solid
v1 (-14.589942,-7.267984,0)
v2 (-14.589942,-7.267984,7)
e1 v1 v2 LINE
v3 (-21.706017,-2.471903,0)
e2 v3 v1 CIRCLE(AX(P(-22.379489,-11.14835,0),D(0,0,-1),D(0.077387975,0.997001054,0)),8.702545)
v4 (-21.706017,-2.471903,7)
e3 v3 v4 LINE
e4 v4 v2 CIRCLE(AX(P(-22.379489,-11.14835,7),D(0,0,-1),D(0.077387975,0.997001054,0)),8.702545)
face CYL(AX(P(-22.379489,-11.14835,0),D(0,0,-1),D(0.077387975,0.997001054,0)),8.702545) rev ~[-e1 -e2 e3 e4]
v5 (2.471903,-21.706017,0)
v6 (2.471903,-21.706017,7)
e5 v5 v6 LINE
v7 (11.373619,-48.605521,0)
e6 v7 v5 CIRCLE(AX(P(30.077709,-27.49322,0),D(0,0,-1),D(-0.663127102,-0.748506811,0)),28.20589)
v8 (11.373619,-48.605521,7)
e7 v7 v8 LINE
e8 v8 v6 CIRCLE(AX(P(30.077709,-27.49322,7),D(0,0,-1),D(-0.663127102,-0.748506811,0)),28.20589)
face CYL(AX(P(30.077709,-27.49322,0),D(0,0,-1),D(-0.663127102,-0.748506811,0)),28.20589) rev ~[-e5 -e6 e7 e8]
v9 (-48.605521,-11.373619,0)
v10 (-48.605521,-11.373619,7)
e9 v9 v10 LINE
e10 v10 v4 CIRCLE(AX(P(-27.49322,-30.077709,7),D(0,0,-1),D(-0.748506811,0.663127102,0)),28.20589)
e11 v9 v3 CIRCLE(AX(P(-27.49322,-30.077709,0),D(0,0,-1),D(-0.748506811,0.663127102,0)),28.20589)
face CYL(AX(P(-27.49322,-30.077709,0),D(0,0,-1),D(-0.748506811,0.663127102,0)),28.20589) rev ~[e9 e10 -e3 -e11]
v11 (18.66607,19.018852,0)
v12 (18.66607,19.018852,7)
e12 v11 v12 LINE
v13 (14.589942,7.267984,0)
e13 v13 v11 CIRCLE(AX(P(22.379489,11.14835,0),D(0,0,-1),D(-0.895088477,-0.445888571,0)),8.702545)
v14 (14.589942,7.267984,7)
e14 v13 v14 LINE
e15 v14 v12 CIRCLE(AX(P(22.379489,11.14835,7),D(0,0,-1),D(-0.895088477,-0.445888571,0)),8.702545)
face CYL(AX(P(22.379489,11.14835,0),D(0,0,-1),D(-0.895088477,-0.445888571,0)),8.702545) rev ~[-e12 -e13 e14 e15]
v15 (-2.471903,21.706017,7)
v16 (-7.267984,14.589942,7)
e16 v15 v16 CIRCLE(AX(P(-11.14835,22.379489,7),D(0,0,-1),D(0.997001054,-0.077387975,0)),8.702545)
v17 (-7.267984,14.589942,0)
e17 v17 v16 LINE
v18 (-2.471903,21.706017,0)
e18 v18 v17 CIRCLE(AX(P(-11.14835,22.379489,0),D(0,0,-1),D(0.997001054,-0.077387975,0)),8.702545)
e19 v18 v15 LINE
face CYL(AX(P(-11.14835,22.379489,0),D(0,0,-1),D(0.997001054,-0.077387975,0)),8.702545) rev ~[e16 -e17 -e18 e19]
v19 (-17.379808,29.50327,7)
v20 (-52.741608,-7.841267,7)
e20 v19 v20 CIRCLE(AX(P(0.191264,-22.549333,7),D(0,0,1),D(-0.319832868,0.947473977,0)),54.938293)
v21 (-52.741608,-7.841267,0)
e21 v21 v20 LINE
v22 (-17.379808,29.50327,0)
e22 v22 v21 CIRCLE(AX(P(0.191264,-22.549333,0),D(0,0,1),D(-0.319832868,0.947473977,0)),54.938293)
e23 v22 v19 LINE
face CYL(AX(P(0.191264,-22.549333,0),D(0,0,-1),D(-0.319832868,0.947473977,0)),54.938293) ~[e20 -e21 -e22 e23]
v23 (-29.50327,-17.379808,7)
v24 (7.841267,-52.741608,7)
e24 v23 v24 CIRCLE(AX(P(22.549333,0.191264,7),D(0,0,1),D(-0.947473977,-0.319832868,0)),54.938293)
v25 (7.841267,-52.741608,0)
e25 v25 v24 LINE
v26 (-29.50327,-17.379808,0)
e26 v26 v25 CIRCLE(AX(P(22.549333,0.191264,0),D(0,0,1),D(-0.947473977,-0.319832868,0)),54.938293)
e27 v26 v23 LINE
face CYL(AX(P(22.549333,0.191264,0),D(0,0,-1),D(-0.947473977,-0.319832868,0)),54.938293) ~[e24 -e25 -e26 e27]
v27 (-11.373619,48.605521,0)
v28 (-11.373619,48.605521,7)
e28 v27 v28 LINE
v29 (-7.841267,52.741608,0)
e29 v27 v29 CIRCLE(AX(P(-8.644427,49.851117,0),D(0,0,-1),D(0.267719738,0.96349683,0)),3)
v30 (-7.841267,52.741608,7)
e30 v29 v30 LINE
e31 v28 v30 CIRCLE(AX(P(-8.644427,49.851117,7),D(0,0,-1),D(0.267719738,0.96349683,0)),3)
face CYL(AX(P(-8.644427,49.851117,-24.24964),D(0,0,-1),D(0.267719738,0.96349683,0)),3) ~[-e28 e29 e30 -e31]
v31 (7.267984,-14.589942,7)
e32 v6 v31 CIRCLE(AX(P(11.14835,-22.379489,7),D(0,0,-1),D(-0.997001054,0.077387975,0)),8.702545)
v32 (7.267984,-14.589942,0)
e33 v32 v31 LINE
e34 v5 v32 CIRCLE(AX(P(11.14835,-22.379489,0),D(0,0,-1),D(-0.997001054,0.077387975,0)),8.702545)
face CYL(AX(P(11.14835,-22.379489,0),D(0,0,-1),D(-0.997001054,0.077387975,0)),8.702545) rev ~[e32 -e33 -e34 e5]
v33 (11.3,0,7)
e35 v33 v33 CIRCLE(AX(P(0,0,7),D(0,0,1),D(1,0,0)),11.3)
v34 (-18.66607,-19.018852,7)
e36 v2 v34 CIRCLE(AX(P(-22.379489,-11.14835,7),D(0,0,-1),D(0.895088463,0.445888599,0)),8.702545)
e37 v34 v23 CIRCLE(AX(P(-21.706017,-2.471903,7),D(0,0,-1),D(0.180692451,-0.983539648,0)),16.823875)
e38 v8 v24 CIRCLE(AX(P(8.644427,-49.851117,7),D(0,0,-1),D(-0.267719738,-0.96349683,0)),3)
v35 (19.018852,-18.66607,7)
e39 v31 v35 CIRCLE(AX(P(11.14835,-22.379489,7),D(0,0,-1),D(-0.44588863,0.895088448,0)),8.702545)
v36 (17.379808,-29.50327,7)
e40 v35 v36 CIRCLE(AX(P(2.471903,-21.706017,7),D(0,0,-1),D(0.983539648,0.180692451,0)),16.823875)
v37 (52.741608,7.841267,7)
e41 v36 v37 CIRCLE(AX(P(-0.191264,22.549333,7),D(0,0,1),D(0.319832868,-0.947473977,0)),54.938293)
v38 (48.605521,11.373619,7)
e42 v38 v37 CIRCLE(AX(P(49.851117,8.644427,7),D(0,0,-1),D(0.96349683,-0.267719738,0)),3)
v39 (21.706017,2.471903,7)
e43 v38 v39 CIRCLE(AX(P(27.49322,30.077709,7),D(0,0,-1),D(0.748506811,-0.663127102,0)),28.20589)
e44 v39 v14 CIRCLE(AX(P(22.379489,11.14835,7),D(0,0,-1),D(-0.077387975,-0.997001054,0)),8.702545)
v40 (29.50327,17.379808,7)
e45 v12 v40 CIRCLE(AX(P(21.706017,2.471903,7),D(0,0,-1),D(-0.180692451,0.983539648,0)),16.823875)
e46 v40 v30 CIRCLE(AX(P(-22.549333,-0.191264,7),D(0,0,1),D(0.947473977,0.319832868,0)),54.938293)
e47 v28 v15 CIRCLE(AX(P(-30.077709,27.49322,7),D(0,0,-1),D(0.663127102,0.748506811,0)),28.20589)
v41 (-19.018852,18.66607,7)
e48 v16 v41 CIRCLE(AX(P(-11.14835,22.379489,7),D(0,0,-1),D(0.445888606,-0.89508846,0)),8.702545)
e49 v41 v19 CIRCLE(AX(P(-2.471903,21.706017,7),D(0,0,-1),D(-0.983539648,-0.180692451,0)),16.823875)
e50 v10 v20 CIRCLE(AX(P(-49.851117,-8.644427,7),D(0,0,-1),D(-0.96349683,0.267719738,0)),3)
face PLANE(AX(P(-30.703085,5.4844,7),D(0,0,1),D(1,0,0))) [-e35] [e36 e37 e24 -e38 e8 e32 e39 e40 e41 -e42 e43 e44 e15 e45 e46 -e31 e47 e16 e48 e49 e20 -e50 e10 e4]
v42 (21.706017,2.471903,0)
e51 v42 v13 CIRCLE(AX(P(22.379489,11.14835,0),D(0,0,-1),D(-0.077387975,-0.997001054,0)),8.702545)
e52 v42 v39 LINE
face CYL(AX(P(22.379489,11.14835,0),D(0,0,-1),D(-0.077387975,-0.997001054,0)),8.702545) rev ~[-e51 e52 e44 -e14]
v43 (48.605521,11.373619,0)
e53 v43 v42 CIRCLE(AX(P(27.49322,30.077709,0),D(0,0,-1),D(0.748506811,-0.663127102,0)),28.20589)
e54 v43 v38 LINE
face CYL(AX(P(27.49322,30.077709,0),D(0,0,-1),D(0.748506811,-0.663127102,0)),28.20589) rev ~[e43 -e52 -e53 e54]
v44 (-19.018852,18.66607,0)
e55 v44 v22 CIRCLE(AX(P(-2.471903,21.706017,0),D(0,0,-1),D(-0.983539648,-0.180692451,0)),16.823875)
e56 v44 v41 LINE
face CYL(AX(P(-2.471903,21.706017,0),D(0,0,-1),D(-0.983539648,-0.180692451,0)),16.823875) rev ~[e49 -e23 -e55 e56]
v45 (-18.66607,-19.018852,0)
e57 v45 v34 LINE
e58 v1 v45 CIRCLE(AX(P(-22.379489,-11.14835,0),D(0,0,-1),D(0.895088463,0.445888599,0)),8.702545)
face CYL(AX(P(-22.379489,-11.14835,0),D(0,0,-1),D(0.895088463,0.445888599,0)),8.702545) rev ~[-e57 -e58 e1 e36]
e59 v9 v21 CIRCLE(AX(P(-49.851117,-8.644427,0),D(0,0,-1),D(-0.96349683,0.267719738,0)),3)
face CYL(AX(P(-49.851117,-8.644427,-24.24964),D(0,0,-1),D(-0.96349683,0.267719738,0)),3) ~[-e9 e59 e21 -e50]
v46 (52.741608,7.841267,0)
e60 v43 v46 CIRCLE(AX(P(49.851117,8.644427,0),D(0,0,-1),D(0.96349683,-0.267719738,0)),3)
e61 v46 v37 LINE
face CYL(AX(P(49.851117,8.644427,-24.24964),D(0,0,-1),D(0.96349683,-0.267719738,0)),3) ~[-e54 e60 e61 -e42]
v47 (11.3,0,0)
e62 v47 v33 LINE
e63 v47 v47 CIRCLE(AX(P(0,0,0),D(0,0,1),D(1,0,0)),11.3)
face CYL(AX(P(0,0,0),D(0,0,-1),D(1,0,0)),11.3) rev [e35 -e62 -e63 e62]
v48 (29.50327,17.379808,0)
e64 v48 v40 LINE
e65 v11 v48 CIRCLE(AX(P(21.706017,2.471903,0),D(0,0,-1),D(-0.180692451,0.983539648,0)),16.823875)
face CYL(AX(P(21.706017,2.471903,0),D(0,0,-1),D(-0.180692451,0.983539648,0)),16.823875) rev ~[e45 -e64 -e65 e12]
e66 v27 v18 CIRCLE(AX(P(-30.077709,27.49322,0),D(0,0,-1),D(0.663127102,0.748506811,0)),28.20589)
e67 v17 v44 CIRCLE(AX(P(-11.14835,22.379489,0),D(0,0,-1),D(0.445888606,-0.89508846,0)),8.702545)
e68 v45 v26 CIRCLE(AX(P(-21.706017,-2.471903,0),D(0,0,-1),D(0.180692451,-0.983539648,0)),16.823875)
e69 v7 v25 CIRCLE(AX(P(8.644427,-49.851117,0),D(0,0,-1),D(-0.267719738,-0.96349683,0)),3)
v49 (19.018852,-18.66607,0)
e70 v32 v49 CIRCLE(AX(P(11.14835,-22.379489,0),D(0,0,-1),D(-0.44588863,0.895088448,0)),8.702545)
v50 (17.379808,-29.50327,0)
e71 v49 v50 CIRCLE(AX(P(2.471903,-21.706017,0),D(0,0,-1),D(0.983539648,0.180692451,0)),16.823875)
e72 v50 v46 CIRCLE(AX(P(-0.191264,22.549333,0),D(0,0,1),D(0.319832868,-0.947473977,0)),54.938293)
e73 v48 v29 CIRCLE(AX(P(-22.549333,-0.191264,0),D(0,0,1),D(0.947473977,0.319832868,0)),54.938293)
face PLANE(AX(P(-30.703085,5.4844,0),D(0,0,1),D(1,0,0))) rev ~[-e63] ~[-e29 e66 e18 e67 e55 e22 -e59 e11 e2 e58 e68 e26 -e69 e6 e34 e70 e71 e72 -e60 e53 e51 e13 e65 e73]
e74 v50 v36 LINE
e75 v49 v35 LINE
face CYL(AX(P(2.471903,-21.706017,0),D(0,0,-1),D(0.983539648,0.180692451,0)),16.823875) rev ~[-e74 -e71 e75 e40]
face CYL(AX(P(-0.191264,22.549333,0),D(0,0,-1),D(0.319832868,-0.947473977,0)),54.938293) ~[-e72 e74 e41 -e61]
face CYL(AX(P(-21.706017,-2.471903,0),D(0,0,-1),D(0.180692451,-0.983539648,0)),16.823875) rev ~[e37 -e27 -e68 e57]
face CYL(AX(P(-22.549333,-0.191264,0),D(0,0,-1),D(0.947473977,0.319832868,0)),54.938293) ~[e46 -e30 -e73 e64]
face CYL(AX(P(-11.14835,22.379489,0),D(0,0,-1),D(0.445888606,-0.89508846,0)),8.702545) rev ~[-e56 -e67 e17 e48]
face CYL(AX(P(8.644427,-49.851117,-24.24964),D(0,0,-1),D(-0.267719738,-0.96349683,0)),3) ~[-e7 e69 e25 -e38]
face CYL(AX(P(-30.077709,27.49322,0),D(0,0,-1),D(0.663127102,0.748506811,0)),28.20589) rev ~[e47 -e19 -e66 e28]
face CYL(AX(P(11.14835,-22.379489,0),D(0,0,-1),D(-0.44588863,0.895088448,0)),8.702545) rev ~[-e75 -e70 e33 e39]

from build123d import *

# Parameters (mm, degrees)
F0_R        = 11.3
F1_DEPTH    = 7
F2_T1_DEPTH = 55.4992808982


# Not quite as in the source:
# - a fillet or chamfer that OpenCascade refuses, or shapes differently, is made with other operations: its cross-section is extruded or revolved along the edge and cut away or added
# - a feature names something its author has since deleted; it is built from what else it names


with BuildPart() as f1:
    # F0 (on Top) → F1 (new body)
    with BuildSketch(Plane.XY):
        with BuildLine():
            ThreePointArc((-19.0188516855, 18.6660698042), (-19.106601179, 24.2218879742), (-17.3798078978, 29.5032704141))
            ThreePointArc((-17.3798078978, 29.5032704141), (-42.8794362662, 11.5553714496), (-54.5032704141, -17.3798078978))
            ThreePointArc((-54.5032704141, -17.3798078978), (-51.6509498036, -14.2819027835), (-48.6055213036, -11.3736190606))
            ThreePointArc((-48.6055213036, -11.3736190606), (-36.3546417903, -3.2999675651), (-21.7060170396, -2.4719034169))
            ThreePointArc((-21.7060170396, -2.4719034169), (-17.5157178103, -3.9318400494), (-14.5899419176, -7.2679842351))
            ThreePointArc((-14.5899419176, -7.2679842351), (-15.4558877949, 5.1774059597), (-7.2679841768, 14.5899419466))
            ThreePointArc((-7.2679841768, 14.5899419466), (-14.000366861, 14.1575501664), (-19.0188516855, 18.6660698042))
        make_face()
        with BuildLine():
            ThreePointArc((-2.4719034169, 21.7060170396), (-3.9318400312, 17.5157178373), (-7.2679841768, 14.5899419466))
            ThreePointArc((-7.2679841768, 14.5899419466), (5.177405829, 15.4558878387), (14.5899417947, 7.2679844819))
            ThreePointArc((14.5899417947, 7.2679844819), (14.1575502222, 14.000367022), (18.6660698042, 19.0188516855))
            ThreePointArc((18.6660698042, 19.0188516855), (24.2218879742, 19.106601179), (29.5032704141, 17.3798078978))
            ThreePointArc((29.5032704141, 17.3798078978), (11.5553714496, 42.8794362662), (-17.3798078978, 54.5032704141))
            ThreePointArc((-17.3798078978, 54.5032704141), (-14.2819027835, 51.6509498036), (-11.3736190606, 48.6055213036))
            ThreePointArc((-11.3736190606, 48.6055213036), (-3.2999675651, 36.3546417903), (-2.4719034169, 21.7060170396))
        make_face()
        with BuildLine():
            ThreePointArc((14.5899417947, 7.2679844819), (5.177405829, 15.4558878387), (-7.2679841768, 14.5899419466))
            ThreePointArc((-7.2679841768, 14.5899419466), (-15.4558877949, 5.1774059597), (-14.5899419176, -7.2679842351))
            ThreePointArc((-14.5899419176, -7.2679842351), (-5.1774060707, -15.4558877577), (7.2679839673, -14.589942051))
            ThreePointArc((7.2679839673, -14.589942051), (13.8592593357, -8.5796812684), (16.3, 0))
            ThreePointArc((16.3, 0), (15.8667269979, 3.733225733), (14.5899417947, 7.2679844819))
        make_face()
        Circle(F0_R, mode=Mode.SUBTRACT)
        with BuildLine():
            ThreePointArc((7.2679839673, -14.589942051), (-5.1774060707, -15.4558877577), (-14.5899419176, -7.2679842351))
            ThreePointArc((-14.5899419176, -7.2679842351), (-14.157550177, -14.0003668918), (-18.6660698042, -19.0188516855))
            ThreePointArc((-18.6660698042, -19.0188516855), (-24.2218879742, -19.106601179), (-29.5032704141, -17.3798078978))
            ThreePointArc((-29.5032704141, -17.3798078978), (-11.5553714496, -42.8794362662), (17.3798078978, -54.5032704141))
            ThreePointArc((17.3798078978, -54.5032704141), (14.2819027835, -51.6509498036), (11.3736190606, -48.6055213036))
            ThreePointArc((11.3736190606, -48.6055213036), (3.2999675651, -36.3546417903), (2.4719034169, -21.7060170396))
            ThreePointArc((2.4719034169, -21.7060170396), (3.9318399658, -17.5157179344), (7.2679839673, -14.589942051))
        make_face()
        with BuildLine():
            ThreePointArc((21.7060170396, 2.4719034169), (17.515717696, 3.9318401265), (14.5899417947, 7.2679844819))
            ThreePointArc((14.5899417947, 7.2679844819), (15.8667269979, 3.733225733), (16.3, 0))
            ThreePointArc((16.3, 0), (13.8592593357, -8.5796812684), (7.2679839673, -14.589942051))
            ThreePointArc((7.2679839673, -14.589942051), (14.0003667504, -14.157550128), (19.0188516855, -18.6660698042))
            ThreePointArc((19.0188516855, -18.6660698042), (19.106601179, -24.2218879742), (17.3798078978, -29.5032704141))
            ThreePointArc((17.3798078978, -29.5032704141), (42.8794362662, -11.5553714496), (54.5032704141, 17.3798078978))
            ThreePointArc((54.5032704141, 17.3798078978), (51.6509498036, 14.2819027835), (48.6055213036, 11.3736190606))
            ThreePointArc((48.6055213036, 11.3736190606), (36.3546417903, 3.2999675651), (21.7060170396, 2.4719034169))
        make_face()
    extrude(amount=F1_DEPTH)

    # F2: fillet of radius 3 on 4 edges, made by hand

    # F2_s2 → F2_t1 (cut)
    with BuildSketch(Plane.XY.offset(-24.2496404491)):
        with BuildLine():
            ThreePointArc((-52.7416075724, -7.8412674467), (-51.7993975119, -10.9256989731), (-48.6055213036, -11.3736190606))
            ThreePointArc((-48.6055213036, -11.3736190606), (-51.6509498036, -14.2819027835), (-54.5032704141, -17.3798078978))
            ThreePointArc((-54.5032704141, -17.3798078978), (-53.8333652751, -12.5715819227), (-52.7416075724, -7.8412674467))
        make_face()
        with BuildLine():
            ThreePointArc((7.8412674467, -52.7416075724), (10.9256989731, -51.7993975119), (11.3736190606, -48.6055213036))
            ThreePointArc((11.3736190606, -48.6055213036), (14.2819027835, -51.6509498036), (17.3798078978, -54.5032704141))
            ThreePointArc((17.3798078978, -54.5032704141), (12.5715819227, -53.8333652751), (7.8412674467, -52.7416075724))
        make_face()
        with BuildLine():
            ThreePointArc((52.7416075724, 7.8412674467), (51.7993975119, 10.9256989731), (48.6055213036, 11.3736190606))
            ThreePointArc((48.6055213036, 11.3736190606), (51.6509498036, 14.2819027835), (54.5032704141, 17.3798078978))
            ThreePointArc((54.5032704141, 17.3798078978), (53.8333652751, 12.5715819227), (52.7416075724, 7.8412674467))
        make_face()
        with BuildLine():
            ThreePointArc((-7.8412674467, 52.7416075724), (-10.9256989731, 51.7993975119), (-11.3736190606, 48.6055213036))
            ThreePointArc((-11.3736190606, 48.6055213036), (-14.2819027835, 51.6509498036), (-17.3798078978, 54.5032704141))
            ThreePointArc((-17.3798078978, 54.5032704141), (-12.5715819227, 53.8333652751), (-7.8412674467, 52.7416075724))
        make_face()
    extrude(amount=F2_T1_DEPTH, mode=Mode.SUBTRACT)


solid = f1.part
